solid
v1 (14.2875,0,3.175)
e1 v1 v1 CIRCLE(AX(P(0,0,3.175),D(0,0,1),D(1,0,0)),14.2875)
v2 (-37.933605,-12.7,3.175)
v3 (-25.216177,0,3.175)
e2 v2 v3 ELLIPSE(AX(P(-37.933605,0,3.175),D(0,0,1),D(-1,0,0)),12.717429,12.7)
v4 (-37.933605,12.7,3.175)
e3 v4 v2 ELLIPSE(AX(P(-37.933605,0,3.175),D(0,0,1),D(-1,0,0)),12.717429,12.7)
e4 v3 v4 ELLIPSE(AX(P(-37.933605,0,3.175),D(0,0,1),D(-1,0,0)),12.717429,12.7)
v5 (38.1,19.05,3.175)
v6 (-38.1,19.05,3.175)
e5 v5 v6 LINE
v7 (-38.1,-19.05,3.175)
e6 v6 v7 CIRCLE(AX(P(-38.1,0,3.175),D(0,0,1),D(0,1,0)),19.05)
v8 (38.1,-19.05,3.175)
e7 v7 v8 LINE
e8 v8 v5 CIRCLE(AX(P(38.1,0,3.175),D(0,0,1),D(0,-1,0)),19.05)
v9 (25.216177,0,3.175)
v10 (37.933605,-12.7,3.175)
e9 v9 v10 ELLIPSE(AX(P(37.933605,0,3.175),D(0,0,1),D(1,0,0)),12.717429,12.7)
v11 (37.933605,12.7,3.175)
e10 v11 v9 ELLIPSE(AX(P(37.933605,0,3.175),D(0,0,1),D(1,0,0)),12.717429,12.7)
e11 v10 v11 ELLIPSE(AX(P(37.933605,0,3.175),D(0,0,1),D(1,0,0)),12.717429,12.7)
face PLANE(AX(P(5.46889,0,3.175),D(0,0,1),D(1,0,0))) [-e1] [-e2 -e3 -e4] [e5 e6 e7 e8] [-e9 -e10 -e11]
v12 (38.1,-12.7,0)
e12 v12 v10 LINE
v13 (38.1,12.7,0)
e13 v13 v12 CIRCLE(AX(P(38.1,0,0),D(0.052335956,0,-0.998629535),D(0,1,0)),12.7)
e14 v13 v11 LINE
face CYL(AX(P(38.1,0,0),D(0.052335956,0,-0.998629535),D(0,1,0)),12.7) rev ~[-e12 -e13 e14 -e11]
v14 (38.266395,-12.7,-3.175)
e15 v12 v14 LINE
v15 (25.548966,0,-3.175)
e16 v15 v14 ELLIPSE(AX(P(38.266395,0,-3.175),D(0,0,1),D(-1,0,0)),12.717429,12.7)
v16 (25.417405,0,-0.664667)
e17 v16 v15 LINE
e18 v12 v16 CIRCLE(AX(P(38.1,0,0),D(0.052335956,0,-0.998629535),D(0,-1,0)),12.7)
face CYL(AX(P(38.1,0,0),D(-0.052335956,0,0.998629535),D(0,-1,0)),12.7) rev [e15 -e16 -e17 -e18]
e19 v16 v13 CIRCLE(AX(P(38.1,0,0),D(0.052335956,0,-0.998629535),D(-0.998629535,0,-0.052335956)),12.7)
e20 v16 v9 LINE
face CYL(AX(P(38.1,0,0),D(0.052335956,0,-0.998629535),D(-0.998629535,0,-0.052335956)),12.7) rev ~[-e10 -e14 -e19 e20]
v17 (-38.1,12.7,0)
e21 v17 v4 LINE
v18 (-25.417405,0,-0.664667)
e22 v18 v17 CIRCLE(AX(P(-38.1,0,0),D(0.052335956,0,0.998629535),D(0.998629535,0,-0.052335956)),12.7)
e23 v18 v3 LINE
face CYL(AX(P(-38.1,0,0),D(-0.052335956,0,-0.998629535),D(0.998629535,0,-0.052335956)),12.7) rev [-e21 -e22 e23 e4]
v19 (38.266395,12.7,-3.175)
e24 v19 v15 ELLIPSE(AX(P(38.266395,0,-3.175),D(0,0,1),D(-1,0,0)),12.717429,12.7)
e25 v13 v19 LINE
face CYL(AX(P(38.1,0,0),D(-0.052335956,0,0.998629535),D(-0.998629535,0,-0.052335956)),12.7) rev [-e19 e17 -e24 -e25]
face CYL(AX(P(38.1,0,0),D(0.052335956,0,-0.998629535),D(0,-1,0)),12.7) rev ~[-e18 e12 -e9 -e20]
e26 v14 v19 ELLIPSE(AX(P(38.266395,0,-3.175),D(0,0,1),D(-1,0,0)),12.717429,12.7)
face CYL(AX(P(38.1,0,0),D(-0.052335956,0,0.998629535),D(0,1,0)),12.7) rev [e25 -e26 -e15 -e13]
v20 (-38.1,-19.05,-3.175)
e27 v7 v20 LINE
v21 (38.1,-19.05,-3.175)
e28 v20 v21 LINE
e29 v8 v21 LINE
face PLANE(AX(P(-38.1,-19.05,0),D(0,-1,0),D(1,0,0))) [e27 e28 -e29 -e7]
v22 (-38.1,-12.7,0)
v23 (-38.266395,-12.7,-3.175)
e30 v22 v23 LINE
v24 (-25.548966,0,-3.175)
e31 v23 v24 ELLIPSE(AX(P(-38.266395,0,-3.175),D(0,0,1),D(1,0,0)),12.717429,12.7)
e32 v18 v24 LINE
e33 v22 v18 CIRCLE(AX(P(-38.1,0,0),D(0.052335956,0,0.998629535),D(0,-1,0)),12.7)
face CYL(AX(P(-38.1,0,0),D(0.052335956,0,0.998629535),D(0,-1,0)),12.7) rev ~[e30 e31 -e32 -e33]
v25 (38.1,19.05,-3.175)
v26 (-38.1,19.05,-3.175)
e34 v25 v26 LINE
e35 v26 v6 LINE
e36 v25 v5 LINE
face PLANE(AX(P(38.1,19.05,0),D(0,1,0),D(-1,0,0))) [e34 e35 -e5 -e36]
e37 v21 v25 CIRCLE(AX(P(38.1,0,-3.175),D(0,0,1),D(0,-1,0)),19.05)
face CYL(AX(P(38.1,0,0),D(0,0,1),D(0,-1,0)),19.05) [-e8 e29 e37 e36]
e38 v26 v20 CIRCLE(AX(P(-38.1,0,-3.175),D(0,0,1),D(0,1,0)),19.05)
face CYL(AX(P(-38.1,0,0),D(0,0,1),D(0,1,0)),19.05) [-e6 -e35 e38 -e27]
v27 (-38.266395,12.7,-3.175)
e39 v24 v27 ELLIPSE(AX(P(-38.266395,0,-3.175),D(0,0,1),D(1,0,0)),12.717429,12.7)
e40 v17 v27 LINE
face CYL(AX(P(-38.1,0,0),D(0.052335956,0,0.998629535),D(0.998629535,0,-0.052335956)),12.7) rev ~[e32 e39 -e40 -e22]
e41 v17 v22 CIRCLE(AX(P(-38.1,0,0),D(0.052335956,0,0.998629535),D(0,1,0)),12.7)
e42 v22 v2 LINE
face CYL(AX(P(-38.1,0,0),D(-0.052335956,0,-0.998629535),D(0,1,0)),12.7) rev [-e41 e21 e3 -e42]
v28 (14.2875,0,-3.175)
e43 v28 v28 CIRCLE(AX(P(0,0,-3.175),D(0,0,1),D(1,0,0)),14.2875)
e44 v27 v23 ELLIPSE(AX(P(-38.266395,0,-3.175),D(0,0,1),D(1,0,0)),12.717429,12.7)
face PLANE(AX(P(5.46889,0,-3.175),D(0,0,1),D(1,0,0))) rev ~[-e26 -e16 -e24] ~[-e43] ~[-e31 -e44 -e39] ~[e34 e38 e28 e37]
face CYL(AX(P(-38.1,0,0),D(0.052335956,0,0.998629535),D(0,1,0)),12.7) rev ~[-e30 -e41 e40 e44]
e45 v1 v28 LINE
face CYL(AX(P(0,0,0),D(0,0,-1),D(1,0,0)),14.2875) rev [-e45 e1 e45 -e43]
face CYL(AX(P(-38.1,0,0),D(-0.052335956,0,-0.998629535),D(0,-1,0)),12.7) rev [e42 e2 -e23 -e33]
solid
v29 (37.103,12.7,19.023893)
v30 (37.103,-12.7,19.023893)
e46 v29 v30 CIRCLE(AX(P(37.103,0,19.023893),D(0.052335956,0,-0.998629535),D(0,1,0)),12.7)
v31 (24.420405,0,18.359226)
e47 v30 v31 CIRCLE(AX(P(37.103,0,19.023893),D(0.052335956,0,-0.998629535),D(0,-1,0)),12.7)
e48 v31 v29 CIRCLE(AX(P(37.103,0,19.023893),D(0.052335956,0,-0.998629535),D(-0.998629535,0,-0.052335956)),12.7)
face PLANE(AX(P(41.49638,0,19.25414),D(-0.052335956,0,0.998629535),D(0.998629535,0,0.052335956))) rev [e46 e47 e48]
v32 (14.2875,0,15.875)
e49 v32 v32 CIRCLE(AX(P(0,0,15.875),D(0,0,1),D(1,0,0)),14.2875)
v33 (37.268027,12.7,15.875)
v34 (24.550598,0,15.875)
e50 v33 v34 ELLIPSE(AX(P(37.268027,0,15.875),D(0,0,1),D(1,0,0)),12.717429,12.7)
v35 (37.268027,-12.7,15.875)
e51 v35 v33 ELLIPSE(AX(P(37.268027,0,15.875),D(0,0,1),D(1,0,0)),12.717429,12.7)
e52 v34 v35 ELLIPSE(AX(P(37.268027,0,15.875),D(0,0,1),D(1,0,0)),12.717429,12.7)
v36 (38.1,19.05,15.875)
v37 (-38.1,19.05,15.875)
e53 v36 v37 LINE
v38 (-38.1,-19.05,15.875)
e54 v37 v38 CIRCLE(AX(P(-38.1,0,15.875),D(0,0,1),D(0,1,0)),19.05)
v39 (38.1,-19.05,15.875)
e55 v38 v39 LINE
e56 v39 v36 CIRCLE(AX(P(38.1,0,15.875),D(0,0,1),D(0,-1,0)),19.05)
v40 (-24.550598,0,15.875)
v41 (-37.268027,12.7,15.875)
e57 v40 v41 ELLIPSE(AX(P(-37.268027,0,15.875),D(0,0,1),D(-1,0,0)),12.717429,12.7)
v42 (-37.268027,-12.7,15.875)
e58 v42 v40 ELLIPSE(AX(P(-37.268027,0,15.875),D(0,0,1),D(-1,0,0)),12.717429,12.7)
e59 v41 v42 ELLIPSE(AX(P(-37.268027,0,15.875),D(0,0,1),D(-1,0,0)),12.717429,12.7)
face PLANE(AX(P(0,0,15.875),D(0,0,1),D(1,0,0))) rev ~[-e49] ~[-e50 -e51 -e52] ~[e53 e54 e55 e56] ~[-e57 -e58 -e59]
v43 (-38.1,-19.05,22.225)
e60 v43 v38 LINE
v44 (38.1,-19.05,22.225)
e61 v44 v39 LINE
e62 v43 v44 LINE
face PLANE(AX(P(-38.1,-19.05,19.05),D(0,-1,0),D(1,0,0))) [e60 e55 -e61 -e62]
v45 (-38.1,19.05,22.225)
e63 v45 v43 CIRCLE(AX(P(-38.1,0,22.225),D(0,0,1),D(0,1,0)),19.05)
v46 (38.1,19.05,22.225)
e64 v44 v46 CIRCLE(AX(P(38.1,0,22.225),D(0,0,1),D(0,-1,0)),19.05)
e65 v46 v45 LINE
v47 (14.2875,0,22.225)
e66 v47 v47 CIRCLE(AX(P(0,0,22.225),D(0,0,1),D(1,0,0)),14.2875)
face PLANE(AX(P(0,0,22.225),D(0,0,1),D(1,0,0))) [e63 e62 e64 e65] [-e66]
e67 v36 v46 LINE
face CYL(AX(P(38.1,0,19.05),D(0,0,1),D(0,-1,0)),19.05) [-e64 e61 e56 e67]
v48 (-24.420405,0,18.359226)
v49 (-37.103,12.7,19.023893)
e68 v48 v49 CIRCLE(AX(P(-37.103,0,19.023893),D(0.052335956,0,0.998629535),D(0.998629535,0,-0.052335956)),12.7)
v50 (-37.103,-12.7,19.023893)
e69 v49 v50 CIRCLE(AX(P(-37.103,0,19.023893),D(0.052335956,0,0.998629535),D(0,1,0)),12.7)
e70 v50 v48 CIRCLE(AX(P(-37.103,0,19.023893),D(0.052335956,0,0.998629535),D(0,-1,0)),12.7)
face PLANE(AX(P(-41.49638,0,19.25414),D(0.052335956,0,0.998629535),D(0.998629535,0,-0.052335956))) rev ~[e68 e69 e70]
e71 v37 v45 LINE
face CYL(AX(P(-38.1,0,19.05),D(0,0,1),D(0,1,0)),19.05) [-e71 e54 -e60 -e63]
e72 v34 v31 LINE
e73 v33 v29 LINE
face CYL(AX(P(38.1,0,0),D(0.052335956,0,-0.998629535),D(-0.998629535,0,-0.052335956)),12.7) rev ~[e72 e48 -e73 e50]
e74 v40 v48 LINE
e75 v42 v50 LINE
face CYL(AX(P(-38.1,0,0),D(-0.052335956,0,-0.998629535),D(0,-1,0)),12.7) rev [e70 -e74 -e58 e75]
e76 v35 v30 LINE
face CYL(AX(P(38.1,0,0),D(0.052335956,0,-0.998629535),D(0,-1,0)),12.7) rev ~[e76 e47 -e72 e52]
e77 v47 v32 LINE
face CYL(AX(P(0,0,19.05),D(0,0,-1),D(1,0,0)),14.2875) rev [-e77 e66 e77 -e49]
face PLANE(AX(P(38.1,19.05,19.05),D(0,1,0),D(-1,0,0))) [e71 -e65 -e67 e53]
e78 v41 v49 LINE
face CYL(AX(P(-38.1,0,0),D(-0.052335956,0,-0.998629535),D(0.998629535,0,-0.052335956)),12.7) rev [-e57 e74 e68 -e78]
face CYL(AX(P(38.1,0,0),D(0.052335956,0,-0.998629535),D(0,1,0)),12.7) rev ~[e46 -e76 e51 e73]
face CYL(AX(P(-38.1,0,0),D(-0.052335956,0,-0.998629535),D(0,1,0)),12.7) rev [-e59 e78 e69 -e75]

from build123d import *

# Parameters (mm, degrees)
F0_R     = 14.2875
F1_DEPTH = 3.175
F2_R     = 14.2875
F3_DEPTH = 3.175
F7_DEPTH = 19.05
F8_ANGLE = 3


# Not quite as in the source:
# - a feature names something its author has since deleted; it is built from what else it names


with BuildPart() as f1:
    # F0 (on Top) → F1 (new body, symmetric)
    with BuildSketch(Plane.XY):
        with BuildLine():
            ThreePointArc((38.1, -19.05), (57.15, 3e-10), (38.0999999995, 19.05))
            Line((38.0999999995, 19.05), (-38.1, 19.05))
            ThreePointArc((-38.1, 19.05), (-57.1499999995, -3e-10), (-38.0999999995, -19.05))
            Line((-38.0999999995, -19.05), (38.1, -19.05))
        make_face()
        Circle(F0_R, mode=Mode.SUBTRACT)
    extrude(amount=F1_DEPTH, both=True)


with BuildPart() as f3:
    # F2 (on Top) → F3 (new body, symmetric)
    with BuildSketch(Plane.XY):
        with BuildLine():
            ThreePointArc((38.1, -19.05), (57.15, 0), (38.1, 19.05))
            Line((38.1, 19.05), (-38.1, 19.05))
            Line((-38.1, 19.05), (-38.1, -19.05))
            Line((-38.1, -19.05), (38.1, -19.05))
        make_face()
        Circle(F2_R, mode=Mode.SUBTRACT)
        with BuildLine():
            Line((-38.1, -19.05), (-38.1, 19.05))
            ThreePointArc((-38.1, 19.05), (-57.15, 0), (-38.1, -19.05))
        make_face()
    extrude(amount=F3_DEPTH, both=True)


with BuildPart() as f1_1:
    # F5: moved
    add(f1.part.moved(Location((0, 0, 19.05))))


with BuildPart() as f7:
    # F6 (on Top) → F7 (new body, symmetric)
    with BuildSketch(Plane.XY):
        with BuildLine():
            Line((-38.1, -12.7), (-38.1, 12.7))
            ThreePointArc((-38.1, 12.7), (-50.8, 0), (-38.1, -12.7))
        make_face()
        with BuildLine():
            ThreePointArc((-38.1, -12.7), (-29.1197438789, -8.9802561211), (-25.4, 0))
            ThreePointArc((-25.4, 0), (-29.1197438789, 8.9802561211), (-38.1, 12.7))
            Line((-38.1, 12.7), (-38.1, -12.7))
        make_face()
    extrude(amount=F7_DEPTH, both=True)


with BuildPart() as f7_1:
    # F8: moved
    add(f7.part.rotate(Axis((-38.1, 0, 0), (0, 1, 0)), F8_ANGLE))


with BuildPart() as f9_1:
    # F9: instance of F7
    add(f7_1.part.mirror(Plane.YZ))


with BuildPart() as f1_2:
    add(f1_1.part)

    # F10: cut F7, F9_1
    add(f7_1.part, mode=Mode.SUBTRACT)
    add(f9_1.part, mode=Mode.SUBTRACT)


with BuildPart() as f3_1:
    add(f3.part)

    # F10: cut F7, F9_1
    add(f7_1.part, mode=Mode.SUBTRACT)
    add(f9_1.part, mode=Mode.SUBTRACT)


solid = Compound([f1_2.part, f3_1.part])
